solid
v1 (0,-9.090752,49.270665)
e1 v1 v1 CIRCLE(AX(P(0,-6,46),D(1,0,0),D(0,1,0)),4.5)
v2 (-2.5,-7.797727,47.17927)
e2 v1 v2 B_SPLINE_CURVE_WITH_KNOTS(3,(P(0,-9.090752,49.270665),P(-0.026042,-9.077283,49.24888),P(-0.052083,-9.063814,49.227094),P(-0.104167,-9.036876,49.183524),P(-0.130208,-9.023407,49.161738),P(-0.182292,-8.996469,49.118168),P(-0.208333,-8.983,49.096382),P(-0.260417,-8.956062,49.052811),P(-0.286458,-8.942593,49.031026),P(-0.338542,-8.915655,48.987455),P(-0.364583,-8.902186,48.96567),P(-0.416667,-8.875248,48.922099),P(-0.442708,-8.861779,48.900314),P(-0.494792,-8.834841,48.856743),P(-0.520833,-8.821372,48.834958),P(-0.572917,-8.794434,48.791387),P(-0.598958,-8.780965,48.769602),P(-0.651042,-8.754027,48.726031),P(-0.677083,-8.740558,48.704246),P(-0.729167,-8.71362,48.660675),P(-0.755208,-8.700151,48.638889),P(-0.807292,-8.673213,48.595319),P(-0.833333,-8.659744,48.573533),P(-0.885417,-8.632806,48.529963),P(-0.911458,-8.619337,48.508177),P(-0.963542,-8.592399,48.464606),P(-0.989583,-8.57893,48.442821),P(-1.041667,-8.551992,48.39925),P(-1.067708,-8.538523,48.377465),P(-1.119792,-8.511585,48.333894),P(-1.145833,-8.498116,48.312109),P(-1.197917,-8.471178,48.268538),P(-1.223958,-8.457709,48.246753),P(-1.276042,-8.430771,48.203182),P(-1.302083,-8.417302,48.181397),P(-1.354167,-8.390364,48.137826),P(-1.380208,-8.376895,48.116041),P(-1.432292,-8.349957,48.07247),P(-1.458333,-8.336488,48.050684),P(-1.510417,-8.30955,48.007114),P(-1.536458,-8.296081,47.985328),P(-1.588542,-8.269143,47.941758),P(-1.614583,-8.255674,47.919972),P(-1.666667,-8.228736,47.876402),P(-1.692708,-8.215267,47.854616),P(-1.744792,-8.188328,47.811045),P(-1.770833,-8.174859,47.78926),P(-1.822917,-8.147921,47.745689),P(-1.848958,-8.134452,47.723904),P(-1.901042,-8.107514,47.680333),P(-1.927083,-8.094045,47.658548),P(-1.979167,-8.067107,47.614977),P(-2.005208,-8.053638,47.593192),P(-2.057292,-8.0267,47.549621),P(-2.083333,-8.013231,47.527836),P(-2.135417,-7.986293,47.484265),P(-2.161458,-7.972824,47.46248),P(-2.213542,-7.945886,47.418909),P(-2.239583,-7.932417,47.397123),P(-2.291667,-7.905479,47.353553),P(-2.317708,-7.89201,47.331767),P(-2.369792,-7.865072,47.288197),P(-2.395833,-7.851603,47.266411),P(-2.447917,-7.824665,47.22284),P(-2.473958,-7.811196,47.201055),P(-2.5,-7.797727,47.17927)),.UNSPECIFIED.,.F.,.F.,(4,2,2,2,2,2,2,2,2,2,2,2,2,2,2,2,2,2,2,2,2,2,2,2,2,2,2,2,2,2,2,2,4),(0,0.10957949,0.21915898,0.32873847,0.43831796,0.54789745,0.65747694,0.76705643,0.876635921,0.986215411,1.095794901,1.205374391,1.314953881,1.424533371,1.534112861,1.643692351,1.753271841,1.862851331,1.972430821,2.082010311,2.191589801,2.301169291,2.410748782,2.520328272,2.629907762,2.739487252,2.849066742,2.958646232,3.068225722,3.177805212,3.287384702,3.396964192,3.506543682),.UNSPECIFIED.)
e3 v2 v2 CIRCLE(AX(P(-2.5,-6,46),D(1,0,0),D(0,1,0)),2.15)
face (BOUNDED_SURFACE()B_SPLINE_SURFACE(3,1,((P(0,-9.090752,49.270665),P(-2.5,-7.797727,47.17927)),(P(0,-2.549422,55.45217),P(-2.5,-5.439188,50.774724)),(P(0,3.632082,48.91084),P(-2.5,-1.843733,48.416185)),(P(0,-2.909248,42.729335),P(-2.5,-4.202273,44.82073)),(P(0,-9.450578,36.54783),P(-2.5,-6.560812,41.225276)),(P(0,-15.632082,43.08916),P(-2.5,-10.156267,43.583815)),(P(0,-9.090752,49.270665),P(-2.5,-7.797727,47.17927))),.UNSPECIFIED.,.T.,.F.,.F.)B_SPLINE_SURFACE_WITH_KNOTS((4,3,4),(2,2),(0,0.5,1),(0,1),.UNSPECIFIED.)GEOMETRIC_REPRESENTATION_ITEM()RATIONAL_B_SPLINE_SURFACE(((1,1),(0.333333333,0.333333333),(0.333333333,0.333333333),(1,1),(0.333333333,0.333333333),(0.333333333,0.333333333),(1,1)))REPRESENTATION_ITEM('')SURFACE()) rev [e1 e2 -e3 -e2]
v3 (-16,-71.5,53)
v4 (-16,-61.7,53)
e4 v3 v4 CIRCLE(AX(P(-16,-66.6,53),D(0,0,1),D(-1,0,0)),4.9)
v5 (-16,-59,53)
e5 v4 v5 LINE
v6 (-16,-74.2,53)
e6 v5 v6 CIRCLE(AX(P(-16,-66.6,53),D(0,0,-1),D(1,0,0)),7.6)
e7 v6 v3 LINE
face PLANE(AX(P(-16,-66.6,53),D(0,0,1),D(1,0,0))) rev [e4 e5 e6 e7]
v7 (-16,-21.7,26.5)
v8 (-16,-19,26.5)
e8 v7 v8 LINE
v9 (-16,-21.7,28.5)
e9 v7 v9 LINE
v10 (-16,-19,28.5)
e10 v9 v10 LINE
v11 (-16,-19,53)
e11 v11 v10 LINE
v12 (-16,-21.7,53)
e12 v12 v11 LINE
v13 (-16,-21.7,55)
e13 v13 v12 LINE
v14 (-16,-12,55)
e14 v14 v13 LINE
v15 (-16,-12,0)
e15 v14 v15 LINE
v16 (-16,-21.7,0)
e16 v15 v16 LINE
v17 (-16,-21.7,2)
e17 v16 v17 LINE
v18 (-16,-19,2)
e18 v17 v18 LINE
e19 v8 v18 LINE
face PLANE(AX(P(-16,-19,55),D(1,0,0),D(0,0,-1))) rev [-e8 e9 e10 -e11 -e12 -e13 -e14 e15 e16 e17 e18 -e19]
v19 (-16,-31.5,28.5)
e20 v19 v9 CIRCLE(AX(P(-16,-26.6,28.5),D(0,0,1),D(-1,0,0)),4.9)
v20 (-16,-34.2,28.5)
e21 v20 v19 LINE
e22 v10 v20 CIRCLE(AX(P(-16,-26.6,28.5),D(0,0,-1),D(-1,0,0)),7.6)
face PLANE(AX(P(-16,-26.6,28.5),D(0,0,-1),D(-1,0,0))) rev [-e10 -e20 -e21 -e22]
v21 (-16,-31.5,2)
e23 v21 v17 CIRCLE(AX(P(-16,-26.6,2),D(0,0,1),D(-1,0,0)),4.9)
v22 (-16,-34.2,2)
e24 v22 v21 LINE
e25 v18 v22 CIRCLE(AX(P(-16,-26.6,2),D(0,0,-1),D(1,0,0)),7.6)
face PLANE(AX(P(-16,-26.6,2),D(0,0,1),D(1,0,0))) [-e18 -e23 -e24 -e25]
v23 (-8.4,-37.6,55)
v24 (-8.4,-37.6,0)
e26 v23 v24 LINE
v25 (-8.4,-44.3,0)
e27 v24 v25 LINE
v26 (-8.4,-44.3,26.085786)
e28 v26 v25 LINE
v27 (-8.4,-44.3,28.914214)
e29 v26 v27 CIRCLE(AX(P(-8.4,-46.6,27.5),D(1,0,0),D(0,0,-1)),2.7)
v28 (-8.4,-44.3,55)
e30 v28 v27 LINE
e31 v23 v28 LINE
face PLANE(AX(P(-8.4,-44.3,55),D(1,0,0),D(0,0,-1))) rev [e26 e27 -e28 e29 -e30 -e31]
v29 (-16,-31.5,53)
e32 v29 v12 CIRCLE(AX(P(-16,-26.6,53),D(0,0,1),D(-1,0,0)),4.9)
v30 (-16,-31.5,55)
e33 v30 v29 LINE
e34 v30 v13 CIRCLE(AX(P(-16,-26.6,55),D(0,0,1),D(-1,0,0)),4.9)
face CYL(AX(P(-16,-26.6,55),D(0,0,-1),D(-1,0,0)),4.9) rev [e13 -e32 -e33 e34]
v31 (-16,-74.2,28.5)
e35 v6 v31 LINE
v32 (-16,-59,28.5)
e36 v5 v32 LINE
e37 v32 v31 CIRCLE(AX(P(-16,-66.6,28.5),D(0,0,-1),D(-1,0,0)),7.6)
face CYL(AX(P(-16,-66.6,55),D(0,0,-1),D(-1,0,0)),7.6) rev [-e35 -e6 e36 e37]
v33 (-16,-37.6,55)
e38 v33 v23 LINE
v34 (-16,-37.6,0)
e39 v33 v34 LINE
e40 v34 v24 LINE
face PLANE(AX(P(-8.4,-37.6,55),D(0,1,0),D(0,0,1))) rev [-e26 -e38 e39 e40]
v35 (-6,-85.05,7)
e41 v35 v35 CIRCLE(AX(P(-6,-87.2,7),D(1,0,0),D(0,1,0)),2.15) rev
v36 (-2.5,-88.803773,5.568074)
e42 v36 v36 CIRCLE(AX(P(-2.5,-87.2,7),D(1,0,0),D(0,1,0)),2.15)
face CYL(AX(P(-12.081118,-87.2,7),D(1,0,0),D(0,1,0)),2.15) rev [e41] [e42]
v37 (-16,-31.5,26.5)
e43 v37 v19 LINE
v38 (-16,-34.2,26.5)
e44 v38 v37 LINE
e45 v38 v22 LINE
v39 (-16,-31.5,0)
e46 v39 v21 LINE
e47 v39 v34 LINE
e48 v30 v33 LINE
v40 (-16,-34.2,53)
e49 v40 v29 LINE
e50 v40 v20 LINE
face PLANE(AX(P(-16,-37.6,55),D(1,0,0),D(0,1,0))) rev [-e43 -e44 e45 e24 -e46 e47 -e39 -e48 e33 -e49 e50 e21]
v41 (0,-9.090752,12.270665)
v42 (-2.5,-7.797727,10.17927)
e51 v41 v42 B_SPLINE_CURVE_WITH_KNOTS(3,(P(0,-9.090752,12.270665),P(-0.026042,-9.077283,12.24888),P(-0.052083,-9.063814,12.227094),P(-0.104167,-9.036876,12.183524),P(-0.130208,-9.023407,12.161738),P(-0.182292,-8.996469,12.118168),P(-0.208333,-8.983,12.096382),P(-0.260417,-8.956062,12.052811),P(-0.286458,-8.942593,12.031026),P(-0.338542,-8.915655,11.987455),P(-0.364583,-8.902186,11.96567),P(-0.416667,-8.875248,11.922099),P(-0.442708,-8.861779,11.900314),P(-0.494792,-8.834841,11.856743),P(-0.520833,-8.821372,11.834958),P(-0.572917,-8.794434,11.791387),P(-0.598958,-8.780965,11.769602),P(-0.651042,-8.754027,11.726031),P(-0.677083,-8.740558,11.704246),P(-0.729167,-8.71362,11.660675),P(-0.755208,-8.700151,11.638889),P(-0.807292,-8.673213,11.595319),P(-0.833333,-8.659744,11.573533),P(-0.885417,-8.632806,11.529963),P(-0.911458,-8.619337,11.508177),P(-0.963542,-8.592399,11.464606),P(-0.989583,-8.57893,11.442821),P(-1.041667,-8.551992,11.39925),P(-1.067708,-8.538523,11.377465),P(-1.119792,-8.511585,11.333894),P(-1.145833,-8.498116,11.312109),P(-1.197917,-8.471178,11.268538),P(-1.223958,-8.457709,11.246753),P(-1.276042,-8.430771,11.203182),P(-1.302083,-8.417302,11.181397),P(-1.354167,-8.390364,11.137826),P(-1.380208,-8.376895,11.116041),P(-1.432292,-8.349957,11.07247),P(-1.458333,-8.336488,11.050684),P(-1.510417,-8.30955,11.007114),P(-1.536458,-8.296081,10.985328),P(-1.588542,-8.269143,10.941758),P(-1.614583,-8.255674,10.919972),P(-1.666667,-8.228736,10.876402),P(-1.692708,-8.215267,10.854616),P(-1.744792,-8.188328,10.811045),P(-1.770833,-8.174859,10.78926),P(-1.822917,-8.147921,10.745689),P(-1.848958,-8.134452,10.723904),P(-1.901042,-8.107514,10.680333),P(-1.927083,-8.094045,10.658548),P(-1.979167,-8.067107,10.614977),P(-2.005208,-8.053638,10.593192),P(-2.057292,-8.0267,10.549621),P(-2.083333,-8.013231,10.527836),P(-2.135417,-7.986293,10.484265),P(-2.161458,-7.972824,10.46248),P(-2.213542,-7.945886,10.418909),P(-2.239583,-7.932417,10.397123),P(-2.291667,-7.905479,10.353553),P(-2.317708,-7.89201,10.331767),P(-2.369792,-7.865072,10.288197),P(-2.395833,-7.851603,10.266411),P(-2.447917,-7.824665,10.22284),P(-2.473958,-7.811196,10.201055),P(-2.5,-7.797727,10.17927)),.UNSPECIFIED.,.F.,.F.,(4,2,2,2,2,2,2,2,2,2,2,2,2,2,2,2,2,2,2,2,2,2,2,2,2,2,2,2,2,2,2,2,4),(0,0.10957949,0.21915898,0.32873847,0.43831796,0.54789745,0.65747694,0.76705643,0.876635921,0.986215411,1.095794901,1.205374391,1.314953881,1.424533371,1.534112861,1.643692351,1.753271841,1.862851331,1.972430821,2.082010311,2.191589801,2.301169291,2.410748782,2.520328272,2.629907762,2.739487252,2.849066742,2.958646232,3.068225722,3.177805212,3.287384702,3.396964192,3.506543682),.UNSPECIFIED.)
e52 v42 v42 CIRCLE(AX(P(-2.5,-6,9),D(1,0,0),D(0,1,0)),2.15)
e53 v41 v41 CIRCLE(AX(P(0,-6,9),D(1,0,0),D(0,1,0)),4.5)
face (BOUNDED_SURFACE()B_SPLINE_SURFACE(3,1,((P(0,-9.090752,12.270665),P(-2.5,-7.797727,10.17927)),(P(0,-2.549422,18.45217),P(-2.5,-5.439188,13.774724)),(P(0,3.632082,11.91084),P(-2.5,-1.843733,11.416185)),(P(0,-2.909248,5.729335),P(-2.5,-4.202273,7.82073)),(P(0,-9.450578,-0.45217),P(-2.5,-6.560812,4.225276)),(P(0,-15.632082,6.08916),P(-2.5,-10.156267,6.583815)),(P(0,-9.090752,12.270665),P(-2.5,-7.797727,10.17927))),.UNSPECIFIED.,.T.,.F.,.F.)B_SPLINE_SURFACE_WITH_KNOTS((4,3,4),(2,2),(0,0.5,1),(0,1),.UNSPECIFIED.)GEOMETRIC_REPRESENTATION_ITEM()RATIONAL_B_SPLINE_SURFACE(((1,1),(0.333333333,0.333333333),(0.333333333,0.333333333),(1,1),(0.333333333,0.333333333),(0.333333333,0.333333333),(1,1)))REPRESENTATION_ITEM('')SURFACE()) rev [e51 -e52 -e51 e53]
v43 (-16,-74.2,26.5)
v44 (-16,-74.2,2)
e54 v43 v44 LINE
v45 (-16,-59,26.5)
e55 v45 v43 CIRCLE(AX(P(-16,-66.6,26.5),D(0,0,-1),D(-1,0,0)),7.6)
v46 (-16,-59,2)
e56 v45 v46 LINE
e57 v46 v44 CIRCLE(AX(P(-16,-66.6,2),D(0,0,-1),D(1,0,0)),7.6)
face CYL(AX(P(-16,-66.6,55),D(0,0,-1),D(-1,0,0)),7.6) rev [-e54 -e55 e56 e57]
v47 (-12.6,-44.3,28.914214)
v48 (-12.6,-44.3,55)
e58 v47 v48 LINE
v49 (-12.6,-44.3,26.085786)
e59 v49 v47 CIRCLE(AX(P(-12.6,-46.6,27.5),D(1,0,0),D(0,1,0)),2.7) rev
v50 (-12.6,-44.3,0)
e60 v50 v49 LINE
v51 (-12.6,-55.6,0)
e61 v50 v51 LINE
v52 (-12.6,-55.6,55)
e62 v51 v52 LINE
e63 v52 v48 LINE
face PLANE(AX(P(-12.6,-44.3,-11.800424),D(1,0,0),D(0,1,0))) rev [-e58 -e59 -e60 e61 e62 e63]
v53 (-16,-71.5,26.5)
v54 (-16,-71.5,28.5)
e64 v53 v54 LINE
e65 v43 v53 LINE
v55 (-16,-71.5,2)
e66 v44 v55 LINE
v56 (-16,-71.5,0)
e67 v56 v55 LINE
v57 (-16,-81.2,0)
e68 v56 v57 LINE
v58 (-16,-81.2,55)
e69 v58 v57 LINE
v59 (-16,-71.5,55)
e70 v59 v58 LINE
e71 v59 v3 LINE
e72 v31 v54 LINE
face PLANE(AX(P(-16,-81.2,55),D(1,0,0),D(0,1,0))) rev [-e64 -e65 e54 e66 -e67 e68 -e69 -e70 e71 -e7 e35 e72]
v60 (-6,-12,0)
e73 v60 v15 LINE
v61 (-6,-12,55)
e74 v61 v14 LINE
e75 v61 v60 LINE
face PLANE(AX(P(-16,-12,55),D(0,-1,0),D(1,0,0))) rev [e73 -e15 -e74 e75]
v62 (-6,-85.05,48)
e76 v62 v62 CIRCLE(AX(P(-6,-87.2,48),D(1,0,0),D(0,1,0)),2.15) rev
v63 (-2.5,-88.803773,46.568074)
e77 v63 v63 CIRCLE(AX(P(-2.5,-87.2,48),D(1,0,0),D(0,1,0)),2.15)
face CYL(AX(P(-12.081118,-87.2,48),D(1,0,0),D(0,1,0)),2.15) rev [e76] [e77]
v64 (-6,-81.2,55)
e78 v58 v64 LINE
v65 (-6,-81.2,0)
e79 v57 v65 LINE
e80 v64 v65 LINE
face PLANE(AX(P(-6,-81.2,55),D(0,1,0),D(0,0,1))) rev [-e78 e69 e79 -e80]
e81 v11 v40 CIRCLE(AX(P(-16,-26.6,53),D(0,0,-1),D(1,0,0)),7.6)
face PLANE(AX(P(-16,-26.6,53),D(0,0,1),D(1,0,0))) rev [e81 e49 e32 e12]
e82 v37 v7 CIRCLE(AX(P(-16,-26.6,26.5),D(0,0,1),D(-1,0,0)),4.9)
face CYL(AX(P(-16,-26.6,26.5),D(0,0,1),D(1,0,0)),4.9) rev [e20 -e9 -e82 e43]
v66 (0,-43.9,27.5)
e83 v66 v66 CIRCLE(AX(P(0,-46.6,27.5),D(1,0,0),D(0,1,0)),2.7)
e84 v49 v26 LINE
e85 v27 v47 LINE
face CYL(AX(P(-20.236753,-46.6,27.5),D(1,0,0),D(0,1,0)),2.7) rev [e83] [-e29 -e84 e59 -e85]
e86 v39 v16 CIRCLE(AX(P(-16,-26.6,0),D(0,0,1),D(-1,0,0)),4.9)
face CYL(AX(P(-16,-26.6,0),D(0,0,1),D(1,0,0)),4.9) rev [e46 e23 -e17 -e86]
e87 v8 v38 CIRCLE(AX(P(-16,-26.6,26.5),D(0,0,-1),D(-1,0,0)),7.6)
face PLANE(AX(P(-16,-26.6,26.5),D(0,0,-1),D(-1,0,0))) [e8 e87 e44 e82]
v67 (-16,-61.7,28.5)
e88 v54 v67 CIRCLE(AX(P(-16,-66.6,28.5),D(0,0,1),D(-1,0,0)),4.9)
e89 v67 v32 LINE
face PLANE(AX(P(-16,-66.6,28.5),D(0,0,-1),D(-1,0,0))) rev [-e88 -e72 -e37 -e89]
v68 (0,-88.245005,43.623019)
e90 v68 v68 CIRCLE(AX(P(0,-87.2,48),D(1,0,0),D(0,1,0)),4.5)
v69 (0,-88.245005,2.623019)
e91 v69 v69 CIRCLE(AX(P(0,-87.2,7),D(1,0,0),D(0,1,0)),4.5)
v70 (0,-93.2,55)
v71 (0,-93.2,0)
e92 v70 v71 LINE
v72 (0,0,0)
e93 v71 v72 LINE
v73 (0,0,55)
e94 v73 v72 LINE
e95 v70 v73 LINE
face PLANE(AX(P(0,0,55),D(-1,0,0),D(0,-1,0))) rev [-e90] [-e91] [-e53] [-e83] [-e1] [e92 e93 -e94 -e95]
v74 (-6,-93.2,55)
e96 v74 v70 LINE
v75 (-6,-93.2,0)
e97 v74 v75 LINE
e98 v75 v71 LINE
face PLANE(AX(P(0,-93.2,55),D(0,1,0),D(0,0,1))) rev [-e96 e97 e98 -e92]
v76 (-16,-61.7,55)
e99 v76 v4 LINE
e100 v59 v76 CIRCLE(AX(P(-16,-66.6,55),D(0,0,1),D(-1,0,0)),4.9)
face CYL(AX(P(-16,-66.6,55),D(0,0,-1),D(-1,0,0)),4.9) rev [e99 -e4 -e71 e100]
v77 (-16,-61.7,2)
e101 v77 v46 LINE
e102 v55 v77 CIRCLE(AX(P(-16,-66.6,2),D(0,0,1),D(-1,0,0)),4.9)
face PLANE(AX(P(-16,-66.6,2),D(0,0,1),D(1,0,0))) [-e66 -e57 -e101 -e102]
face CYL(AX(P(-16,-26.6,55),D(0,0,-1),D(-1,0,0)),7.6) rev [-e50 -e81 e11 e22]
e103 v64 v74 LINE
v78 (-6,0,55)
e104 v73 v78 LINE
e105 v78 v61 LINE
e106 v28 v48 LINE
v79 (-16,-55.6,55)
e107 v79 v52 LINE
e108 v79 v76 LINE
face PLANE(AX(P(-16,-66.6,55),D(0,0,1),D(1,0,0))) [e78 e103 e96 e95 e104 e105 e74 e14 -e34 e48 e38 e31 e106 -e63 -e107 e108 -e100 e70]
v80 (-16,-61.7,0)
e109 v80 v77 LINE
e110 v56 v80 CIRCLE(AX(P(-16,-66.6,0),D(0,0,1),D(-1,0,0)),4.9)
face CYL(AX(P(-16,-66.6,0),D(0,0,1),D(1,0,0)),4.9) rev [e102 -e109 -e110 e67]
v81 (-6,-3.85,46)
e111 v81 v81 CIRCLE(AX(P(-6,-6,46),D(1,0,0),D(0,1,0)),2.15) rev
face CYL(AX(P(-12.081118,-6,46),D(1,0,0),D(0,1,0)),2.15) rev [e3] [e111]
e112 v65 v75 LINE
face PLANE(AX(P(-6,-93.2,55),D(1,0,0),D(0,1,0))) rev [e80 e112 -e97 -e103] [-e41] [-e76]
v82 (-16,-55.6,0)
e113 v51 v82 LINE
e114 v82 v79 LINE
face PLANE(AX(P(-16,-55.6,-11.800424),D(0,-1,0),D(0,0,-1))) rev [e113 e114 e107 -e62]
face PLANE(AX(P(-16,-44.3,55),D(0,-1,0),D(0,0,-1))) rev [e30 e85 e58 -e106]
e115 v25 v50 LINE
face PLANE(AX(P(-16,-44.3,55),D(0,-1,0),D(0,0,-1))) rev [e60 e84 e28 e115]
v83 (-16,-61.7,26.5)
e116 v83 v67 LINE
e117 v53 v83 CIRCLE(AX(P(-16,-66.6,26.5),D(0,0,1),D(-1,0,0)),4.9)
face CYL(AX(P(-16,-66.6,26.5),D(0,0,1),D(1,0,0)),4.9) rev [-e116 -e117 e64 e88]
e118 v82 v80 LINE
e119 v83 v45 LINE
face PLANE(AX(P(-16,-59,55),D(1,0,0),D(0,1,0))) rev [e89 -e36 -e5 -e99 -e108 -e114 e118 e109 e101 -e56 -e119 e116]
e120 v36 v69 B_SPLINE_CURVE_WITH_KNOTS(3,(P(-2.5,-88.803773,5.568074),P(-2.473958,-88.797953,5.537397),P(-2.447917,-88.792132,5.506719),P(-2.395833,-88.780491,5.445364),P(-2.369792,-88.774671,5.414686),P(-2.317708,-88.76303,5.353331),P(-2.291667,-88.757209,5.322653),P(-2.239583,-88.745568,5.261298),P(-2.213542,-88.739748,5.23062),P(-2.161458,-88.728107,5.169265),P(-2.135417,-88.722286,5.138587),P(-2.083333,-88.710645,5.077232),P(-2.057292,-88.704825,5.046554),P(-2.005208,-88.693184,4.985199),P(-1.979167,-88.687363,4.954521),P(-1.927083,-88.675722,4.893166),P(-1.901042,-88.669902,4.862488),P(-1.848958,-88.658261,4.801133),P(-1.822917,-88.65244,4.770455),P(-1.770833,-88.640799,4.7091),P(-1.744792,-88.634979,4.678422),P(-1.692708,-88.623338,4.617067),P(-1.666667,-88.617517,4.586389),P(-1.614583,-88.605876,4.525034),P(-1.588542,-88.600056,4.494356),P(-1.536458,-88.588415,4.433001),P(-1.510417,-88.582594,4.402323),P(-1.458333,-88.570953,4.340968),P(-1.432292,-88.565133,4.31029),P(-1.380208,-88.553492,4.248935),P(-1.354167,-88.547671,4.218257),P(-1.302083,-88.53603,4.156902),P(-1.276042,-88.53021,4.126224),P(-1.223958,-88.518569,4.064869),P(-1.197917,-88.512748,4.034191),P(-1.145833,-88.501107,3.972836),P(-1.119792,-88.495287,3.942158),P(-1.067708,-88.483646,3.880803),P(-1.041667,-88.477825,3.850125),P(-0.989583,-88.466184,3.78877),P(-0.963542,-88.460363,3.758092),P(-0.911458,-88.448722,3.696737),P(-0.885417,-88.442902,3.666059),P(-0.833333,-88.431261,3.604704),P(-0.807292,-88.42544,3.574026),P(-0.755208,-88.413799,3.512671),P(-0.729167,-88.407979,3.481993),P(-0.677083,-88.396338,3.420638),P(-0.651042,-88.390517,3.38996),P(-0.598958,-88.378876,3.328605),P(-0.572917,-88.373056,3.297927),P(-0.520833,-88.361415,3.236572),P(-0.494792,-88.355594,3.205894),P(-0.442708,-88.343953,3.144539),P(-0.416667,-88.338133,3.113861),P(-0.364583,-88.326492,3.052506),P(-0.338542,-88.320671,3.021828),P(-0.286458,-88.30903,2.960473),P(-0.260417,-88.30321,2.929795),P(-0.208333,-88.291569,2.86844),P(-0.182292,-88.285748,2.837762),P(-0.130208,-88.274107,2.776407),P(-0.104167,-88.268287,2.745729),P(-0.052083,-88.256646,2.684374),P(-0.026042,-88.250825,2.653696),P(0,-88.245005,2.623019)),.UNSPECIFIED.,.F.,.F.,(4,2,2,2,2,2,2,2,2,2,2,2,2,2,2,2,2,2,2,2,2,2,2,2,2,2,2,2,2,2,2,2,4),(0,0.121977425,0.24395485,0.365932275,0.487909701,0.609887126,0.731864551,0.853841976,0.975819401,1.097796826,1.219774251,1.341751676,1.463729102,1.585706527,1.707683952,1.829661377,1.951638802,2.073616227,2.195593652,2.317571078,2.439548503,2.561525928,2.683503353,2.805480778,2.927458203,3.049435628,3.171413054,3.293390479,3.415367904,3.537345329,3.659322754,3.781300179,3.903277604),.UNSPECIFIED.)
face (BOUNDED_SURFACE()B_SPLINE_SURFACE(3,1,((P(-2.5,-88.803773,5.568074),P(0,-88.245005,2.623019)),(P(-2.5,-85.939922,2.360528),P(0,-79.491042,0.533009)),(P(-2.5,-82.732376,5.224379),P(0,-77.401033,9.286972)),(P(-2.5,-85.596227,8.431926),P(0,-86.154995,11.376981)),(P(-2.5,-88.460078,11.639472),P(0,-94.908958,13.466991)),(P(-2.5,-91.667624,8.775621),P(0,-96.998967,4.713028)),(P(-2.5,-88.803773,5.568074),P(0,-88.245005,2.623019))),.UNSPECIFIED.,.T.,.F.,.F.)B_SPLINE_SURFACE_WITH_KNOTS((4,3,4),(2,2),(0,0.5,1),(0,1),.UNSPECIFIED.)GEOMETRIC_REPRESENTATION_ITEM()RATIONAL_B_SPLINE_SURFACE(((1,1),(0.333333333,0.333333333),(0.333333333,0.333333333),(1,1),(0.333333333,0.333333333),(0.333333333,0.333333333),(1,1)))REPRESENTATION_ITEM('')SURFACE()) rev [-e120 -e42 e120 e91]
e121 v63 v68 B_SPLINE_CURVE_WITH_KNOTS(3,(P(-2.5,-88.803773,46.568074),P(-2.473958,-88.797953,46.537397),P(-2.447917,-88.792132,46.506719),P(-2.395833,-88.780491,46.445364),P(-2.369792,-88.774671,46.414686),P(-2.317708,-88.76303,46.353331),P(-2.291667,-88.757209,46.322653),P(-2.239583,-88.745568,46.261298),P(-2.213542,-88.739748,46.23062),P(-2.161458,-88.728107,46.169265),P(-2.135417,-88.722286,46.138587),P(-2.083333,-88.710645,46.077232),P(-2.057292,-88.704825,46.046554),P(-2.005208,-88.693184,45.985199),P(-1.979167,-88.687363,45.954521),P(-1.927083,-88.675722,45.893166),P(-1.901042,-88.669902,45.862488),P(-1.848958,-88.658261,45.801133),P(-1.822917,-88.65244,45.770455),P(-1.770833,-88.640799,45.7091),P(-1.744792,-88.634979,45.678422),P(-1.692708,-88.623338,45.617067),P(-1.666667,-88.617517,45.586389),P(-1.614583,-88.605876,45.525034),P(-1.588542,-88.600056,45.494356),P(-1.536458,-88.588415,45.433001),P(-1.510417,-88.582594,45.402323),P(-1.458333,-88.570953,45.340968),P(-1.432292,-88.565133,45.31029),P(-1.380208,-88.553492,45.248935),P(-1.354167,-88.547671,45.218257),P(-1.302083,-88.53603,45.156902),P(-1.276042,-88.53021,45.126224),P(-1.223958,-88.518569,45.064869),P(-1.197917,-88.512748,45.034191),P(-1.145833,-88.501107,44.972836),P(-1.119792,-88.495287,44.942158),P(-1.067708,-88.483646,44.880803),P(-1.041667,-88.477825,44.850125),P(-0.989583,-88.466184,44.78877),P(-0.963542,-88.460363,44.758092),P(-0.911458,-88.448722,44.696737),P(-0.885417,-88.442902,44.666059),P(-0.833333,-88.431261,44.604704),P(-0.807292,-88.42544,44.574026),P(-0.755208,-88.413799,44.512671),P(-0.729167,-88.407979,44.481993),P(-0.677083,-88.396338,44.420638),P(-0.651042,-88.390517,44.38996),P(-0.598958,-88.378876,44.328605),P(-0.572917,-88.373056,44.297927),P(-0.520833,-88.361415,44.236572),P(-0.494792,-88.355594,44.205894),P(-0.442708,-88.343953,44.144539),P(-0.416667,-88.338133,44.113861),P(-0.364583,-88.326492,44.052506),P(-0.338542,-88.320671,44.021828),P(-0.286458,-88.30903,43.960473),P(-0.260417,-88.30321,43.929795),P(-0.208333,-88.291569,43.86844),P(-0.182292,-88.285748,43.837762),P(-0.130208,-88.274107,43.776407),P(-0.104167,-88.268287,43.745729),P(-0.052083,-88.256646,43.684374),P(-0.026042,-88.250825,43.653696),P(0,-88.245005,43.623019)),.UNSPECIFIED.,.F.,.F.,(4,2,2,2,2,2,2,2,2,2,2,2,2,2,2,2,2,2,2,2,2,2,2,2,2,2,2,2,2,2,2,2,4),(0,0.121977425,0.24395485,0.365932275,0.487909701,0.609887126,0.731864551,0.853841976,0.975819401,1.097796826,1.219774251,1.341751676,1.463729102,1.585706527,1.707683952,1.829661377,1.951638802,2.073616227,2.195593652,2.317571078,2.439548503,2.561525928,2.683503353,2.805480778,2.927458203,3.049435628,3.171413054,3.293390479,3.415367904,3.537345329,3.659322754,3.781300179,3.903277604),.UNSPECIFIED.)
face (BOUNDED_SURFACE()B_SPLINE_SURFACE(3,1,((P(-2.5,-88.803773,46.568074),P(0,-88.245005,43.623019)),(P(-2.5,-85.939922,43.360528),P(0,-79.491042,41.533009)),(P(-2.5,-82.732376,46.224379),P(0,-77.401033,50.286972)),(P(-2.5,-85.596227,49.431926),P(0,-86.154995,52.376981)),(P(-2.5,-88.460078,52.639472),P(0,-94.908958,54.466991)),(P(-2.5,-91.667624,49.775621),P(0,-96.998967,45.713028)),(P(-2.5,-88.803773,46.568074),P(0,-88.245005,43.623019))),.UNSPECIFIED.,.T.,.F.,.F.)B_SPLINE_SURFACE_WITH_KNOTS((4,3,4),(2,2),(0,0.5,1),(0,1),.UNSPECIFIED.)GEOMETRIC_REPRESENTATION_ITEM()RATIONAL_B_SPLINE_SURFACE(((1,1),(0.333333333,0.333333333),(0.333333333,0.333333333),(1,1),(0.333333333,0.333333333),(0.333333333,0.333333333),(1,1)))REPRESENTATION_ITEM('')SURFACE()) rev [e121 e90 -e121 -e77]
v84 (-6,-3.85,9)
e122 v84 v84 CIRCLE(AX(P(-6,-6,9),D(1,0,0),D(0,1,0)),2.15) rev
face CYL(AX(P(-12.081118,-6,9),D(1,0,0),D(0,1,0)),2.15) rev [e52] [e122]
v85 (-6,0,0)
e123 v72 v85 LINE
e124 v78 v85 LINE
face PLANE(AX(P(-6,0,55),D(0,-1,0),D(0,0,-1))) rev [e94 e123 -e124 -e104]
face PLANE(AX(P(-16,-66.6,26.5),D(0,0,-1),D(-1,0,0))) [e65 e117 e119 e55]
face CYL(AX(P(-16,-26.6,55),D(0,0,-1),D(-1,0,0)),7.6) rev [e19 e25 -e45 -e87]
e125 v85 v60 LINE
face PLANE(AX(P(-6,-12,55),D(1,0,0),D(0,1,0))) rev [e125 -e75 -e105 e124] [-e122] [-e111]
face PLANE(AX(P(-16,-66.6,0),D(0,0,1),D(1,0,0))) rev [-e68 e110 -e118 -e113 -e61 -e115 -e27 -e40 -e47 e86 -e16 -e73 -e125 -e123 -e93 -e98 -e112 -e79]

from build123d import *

# Parameters (mm, degrees)
BOSS_EXTRUDE1_DEPTH = 55
BOSS_EXTRUDE2_START = 2
BOSS_EXTRUDE2_DEPTH = 2
BOSS_EXTRUDE3_START = 2
BOSS_EXTRUDE3_DEPTH = 2
BOSS_EXTRUDE5_START = 2
BOSS_EXTRUDE5_DEPTH = 2
BOSS_EXTRUDE6_DEPTH = 2
SKETCH7_W           = 3.4
SKETCH7_H           = 11.3
CUT_EXTRUDE2_DEPTH  = 55
SKETCH8_R           = 2.15
CUT_EXTRUDE3_DEPTH  = 6
CUT_EXTRUDE4_REACH  = 111.395
SKETCH9_R           = 2.7
LPATTERN1_COUNT     = 2
LPATTERN1_PITCH     = 37
LPATTERN2_COUNT     = 2
LPATTERN2_PITCH     = 41


with BuildPart() as part:
    # Sketch1 → Boss-Extrude1 (new body)
    with BuildSketch(Plane.XY):
        with BuildLine():
            Line((0, 0), (0, -93.2))
            Line((0, -93.2), (-6, -93.2))
            Line((-6, -93.2), (-6, -81.2))
            Line((-6, -81.2), (-16, -81.2))
            Line((-16, -81.2), (-16, -74.2))
            ThreePointArc((-16, -74.2), (-8.4, -66.6), (-16, -59))
            Line((-16, -59), (-16, -44.3))
            Line((-16, -44.3), (-8.4, -44.3))
            Line((-8.4, -44.3), (-8.4, -37.6))
            Line((-8.4, -37.6), (-16, -37.6))
            Line((-16, -37.6), (-16, -34.2))
            ThreePointArc((-16, -34.2), (-8.4, -26.6), (-16, -19))
            Line((-16, -19), (-16, -12))
            Line((-16, -12), (-6, -12))
            Line((-6, -12), (-6, 0))
            Line((-6, 0), (0, 0))
        make_face()
    extrude(amount=BOSS_EXTRUDE1_DEPTH)

    # Sketch2 → Boss-Extrude2 (add)
    with BuildSketch(Plane(origin=(0, 0, 28.5), x_dir=(-1, 0, 0), z_dir=(0, 0, -1)).offset(BOSS_EXTRUDE2_START)):
        with BuildLine():
            Line((16, -34.2), (16, -31.5))
            ThreePointArc((16, -31.5), (11.1, -26.6), (16, -21.7))
            Line((16, -21.7), (16, -19))
            ThreePointArc((16, -19), (8.4, -26.6), (16, -34.2))
        make_face()
    extrude(amount=-BOSS_EXTRUDE2_DEPTH)

    # Sketch3 → Boss-Extrude3 (add)
    with BuildSketch(Plane(origin=(0, 0, 28.5), x_dir=(-1, 0, 0), z_dir=(0, 0, -1)).offset(BOSS_EXTRUDE3_START)):
        with BuildLine():
            Line((16, -74.2), (16, -71.5))
            ThreePointArc((16, -71.5), (11.1, -66.6), (16, -61.7))
            Line((16, -61.7), (16, -59))
            ThreePointArc((16, -59), (8.4, -66.6), (16, -74.2))
        make_face()
    extrude(amount=-BOSS_EXTRUDE3_DEPTH)

    # Sketch4 → Boss-Extrude5 (add)
    with BuildSketch(Plane(origin=(0, 0, 2), x_dir=(-1, 0, 0), z_dir=(0, 0, -1)).offset(BOSS_EXTRUDE5_START)):
        with BuildLine():
            Line((16, -59), (16, -61.7))
            ThreePointArc((16, -61.7), (11.1, -66.6), (16, -71.5))
            Line((16, -71.5), (16, -74.2))
            ThreePointArc((16, -74.2), (8.4, -66.6), (16, -59))
        make_face()
        with BuildLine():
            Line((16, -19), (16, -21.7))
            ThreePointArc((16, -21.7), (11.1, -26.6), (16, -31.5))
            Line((16, -31.5), (16, -34.2))
            ThreePointArc((16, -34.2), (8.4, -26.6), (16, -19))
        make_face()
    extrude(amount=-BOSS_EXTRUDE5_DEPTH)

    # Sketch5 → Boss-Extrude6 (add)
    with BuildSketch(Plane(origin=(0, 0, 53), x_dir=(-1, 0, 0), z_dir=(0, 0, -1))):
        with BuildLine():
            Line((16, -19), (16, -21.7))
            ThreePointArc((16, -21.7), (11.1, -26.6), (16, -31.5))
            Line((16, -31.5), (16, -34.2))
            ThreePointArc((16, -34.2), (8.4, -26.6), (16, -19))
        make_face()
        with BuildLine():
            Line((16, -59), (16, -61.7))
            ThreePointArc((16, -61.7), (11.1, -66.6), (16, -71.5))
            Line((16, -71.5), (16, -74.2))
            ThreePointArc((16, -74.2), (8.4, -66.6), (16, -59))
        make_face()
    extrude(amount=-BOSS_EXTRUDE6_DEPTH)

    # Sketch7 → Cut-Extrude2 (cut)
    with BuildSketch(Plane.XY.offset(55)):
        with Locations((-14.3, -49.95)):
            Rectangle(SKETCH7_W, SKETCH7_H)
    extrude(amount=-CUT_EXTRUDE2_DEPTH, mode=Mode.SUBTRACT)

    # Sketch8 → Cut-Extrude3 (cut)
    with BuildSketch(Plane(origin=(0, 0, 0), x_dir=(0, 0, -1), z_dir=(1, 0, 0))):
        with Locations(Location((-46, -6, 0), (0, 0, 90))):
            Circle(SKETCH8_R)
        with Locations(Location((-9, -6, 0), (0, 0, 90))):
            Circle(SKETCH8_R)
        with Locations(Location((-7, -87.2, 0), (0, 0, 90))):
            Circle(SKETCH8_R)
        with Locations(Location((-48, -87.2, 0), (0, 0, 90))):
            Circle(SKETCH8_R)
    extrude(amount=-CUT_EXTRUDE3_DEPTH, mode=Mode.SUBTRACT)

    # Cut-Extrude4: up to this face of the body (flat: up to its plane)
    cut_extrude4_end = Plane(part.part.faces().sort_by_distance((-12.6, -49.95, 27.5))[0])
    # Sketch9 → Cut-Extrude4 (cut, up to the picked face)
    with BuildSketch(Plane(origin=(0, 0, 0), x_dir=(0, 0, -1), z_dir=(1, 0, 0)), mode=Mode.PRIVATE) as cut_extrude4_sk1:
        with Locations(Location((-27.5, -46.6, 0), (0, 0, 90))):
            Circle(SKETCH9_R)
    cut_extrude4_tool1 = split(extrude(cut_extrude4_sk1.sketch, amount=-CUT_EXTRUDE4_REACH, mode=Mode.PRIVATE), bisect_by=cut_extrude4_end, keep=Keep.BOTH, mode=Mode.PRIVATE)
    add(cut_extrude4_tool1.solids().sort_by(Axis((0, -46.6, 27.5), (-1, 0, 0)))[0], mode=Mode.SUBTRACT)

    # Cut-Loft1: read off the stored shape, not the designer's step
    # Cut-Loft1: loft between two sections, ruled curve by curve
    cut_loft1_from = [
        Edge.make_bspline([(0, -9.090752309, 49.270665095), (0, -2.54942212, 55.452169714), (0, 3.632082499, 48.910839524), (0, -2.909247691, 42.729334905), (0, -9.45057788, 36.547830286), (0, -15.632082499, 43.089160476), (0, -9.090752309, 49.270665095)], [0, 0, 0, 0, 0.5, 0.5, 0.5, 1, 1, 1, 1], 3, [1, 0.333333333, 0.333333333, 1, 0.333333333, 0.333333333, 1]),
    ]
    cut_loft1_to = [
        Edge.make_bspline([(-2.5, -7.797727139, 47.179269746), (-2.5, -5.439187646, 50.774724024), (-2.5, -1.843733369, 48.416184531), (-2.5, -4.202272861, 44.820730254), (-2.5, -6.560812354, 41.225275976), (-2.5, -10.156266631, 43.583815469), (-2.5, -7.797727139, 47.179269746)], [0, 0, 0, 0, 0.5, 0.5, 0.5, 1, 1, 1, 1], 3, [1, 0.333333333, 0.333333333, 1, 0.333333333, 0.333333333, 1]),
    ]
    cut_loft1 = Solid(Shell([*[Face.make_surface_from_curves(cut_loft1_from[k], cut_loft1_to[k]) for k in range(1)], Face(Wire(cut_loft1_from)), Face(Wire(cut_loft1_to))]))
    add(cut_loft1, mode=Mode.SUBTRACT)

    # LPattern1: Cut-Loft1 ×2
    with Locations(*[(0, 0, -i * LPATTERN1_PITCH) for i in range(1, LPATTERN1_COUNT)]):
        add(cut_loft1, mode=Mode.SUBTRACT)

    # Cut-Loft2: read off the stored shape, not the designer's step
    # Cut-Loft2: loft between two sections, ruled curve by curve
    cut_loft2_from = [
        Edge.make_bspline([(-2.5, -88.803773463, 46.568074485), (-2.5, -85.939922433, 43.36052756), (-2.5, -82.732375507, 46.22437859), (-2.5, -85.596226537, 49.431925515), (-2.5, -88.460077567, 52.63947244), (-2.5, -91.667624493, 49.77562141), (-2.5, -88.803773463, 46.568074485)], [0, 0, 0, 0, 0.5, 0.5, 0.5, 1, 1, 1, 1], 3, [1, 0.333333333, 0.333333333, 1, 0.333333333, 0.333333333, 1]),
    ]
    cut_loft2_to = [
        Edge.make_bspline([(0, -88.245004687, 43.623018711), (0, -79.491042109, 41.533009337), (0, -77.401032735, 50.286971915), (0, -86.154995313, 52.376981289), (0, -94.908957891, 54.466990663), (0, -96.998967265, 45.713028085), (0, -88.245004687, 43.623018711)], [0, 0, 0, 0, 0.5, 0.5, 0.5, 1, 1, 1, 1], 3, [1, 0.333333333, 0.333333333, 1, 0.333333333, 0.333333333, 1]),
    ]
    cut_loft2 = Solid(Shell([*[Face.make_surface_from_curves(cut_loft2_from[k], cut_loft2_to[k]) for k in range(1)], Face(Wire(cut_loft2_from)), Face(Wire(cut_loft2_to))]))
    add(cut_loft2, mode=Mode.SUBTRACT)

    # LPattern2: Cut-Loft2 ×2
    with Locations(*[(0, 0, -i * LPATTERN2_PITCH) for i in range(1, LPATTERN2_COUNT)]):
        add(cut_loft2, mode=Mode.SUBTRACT)


solid = part.part
